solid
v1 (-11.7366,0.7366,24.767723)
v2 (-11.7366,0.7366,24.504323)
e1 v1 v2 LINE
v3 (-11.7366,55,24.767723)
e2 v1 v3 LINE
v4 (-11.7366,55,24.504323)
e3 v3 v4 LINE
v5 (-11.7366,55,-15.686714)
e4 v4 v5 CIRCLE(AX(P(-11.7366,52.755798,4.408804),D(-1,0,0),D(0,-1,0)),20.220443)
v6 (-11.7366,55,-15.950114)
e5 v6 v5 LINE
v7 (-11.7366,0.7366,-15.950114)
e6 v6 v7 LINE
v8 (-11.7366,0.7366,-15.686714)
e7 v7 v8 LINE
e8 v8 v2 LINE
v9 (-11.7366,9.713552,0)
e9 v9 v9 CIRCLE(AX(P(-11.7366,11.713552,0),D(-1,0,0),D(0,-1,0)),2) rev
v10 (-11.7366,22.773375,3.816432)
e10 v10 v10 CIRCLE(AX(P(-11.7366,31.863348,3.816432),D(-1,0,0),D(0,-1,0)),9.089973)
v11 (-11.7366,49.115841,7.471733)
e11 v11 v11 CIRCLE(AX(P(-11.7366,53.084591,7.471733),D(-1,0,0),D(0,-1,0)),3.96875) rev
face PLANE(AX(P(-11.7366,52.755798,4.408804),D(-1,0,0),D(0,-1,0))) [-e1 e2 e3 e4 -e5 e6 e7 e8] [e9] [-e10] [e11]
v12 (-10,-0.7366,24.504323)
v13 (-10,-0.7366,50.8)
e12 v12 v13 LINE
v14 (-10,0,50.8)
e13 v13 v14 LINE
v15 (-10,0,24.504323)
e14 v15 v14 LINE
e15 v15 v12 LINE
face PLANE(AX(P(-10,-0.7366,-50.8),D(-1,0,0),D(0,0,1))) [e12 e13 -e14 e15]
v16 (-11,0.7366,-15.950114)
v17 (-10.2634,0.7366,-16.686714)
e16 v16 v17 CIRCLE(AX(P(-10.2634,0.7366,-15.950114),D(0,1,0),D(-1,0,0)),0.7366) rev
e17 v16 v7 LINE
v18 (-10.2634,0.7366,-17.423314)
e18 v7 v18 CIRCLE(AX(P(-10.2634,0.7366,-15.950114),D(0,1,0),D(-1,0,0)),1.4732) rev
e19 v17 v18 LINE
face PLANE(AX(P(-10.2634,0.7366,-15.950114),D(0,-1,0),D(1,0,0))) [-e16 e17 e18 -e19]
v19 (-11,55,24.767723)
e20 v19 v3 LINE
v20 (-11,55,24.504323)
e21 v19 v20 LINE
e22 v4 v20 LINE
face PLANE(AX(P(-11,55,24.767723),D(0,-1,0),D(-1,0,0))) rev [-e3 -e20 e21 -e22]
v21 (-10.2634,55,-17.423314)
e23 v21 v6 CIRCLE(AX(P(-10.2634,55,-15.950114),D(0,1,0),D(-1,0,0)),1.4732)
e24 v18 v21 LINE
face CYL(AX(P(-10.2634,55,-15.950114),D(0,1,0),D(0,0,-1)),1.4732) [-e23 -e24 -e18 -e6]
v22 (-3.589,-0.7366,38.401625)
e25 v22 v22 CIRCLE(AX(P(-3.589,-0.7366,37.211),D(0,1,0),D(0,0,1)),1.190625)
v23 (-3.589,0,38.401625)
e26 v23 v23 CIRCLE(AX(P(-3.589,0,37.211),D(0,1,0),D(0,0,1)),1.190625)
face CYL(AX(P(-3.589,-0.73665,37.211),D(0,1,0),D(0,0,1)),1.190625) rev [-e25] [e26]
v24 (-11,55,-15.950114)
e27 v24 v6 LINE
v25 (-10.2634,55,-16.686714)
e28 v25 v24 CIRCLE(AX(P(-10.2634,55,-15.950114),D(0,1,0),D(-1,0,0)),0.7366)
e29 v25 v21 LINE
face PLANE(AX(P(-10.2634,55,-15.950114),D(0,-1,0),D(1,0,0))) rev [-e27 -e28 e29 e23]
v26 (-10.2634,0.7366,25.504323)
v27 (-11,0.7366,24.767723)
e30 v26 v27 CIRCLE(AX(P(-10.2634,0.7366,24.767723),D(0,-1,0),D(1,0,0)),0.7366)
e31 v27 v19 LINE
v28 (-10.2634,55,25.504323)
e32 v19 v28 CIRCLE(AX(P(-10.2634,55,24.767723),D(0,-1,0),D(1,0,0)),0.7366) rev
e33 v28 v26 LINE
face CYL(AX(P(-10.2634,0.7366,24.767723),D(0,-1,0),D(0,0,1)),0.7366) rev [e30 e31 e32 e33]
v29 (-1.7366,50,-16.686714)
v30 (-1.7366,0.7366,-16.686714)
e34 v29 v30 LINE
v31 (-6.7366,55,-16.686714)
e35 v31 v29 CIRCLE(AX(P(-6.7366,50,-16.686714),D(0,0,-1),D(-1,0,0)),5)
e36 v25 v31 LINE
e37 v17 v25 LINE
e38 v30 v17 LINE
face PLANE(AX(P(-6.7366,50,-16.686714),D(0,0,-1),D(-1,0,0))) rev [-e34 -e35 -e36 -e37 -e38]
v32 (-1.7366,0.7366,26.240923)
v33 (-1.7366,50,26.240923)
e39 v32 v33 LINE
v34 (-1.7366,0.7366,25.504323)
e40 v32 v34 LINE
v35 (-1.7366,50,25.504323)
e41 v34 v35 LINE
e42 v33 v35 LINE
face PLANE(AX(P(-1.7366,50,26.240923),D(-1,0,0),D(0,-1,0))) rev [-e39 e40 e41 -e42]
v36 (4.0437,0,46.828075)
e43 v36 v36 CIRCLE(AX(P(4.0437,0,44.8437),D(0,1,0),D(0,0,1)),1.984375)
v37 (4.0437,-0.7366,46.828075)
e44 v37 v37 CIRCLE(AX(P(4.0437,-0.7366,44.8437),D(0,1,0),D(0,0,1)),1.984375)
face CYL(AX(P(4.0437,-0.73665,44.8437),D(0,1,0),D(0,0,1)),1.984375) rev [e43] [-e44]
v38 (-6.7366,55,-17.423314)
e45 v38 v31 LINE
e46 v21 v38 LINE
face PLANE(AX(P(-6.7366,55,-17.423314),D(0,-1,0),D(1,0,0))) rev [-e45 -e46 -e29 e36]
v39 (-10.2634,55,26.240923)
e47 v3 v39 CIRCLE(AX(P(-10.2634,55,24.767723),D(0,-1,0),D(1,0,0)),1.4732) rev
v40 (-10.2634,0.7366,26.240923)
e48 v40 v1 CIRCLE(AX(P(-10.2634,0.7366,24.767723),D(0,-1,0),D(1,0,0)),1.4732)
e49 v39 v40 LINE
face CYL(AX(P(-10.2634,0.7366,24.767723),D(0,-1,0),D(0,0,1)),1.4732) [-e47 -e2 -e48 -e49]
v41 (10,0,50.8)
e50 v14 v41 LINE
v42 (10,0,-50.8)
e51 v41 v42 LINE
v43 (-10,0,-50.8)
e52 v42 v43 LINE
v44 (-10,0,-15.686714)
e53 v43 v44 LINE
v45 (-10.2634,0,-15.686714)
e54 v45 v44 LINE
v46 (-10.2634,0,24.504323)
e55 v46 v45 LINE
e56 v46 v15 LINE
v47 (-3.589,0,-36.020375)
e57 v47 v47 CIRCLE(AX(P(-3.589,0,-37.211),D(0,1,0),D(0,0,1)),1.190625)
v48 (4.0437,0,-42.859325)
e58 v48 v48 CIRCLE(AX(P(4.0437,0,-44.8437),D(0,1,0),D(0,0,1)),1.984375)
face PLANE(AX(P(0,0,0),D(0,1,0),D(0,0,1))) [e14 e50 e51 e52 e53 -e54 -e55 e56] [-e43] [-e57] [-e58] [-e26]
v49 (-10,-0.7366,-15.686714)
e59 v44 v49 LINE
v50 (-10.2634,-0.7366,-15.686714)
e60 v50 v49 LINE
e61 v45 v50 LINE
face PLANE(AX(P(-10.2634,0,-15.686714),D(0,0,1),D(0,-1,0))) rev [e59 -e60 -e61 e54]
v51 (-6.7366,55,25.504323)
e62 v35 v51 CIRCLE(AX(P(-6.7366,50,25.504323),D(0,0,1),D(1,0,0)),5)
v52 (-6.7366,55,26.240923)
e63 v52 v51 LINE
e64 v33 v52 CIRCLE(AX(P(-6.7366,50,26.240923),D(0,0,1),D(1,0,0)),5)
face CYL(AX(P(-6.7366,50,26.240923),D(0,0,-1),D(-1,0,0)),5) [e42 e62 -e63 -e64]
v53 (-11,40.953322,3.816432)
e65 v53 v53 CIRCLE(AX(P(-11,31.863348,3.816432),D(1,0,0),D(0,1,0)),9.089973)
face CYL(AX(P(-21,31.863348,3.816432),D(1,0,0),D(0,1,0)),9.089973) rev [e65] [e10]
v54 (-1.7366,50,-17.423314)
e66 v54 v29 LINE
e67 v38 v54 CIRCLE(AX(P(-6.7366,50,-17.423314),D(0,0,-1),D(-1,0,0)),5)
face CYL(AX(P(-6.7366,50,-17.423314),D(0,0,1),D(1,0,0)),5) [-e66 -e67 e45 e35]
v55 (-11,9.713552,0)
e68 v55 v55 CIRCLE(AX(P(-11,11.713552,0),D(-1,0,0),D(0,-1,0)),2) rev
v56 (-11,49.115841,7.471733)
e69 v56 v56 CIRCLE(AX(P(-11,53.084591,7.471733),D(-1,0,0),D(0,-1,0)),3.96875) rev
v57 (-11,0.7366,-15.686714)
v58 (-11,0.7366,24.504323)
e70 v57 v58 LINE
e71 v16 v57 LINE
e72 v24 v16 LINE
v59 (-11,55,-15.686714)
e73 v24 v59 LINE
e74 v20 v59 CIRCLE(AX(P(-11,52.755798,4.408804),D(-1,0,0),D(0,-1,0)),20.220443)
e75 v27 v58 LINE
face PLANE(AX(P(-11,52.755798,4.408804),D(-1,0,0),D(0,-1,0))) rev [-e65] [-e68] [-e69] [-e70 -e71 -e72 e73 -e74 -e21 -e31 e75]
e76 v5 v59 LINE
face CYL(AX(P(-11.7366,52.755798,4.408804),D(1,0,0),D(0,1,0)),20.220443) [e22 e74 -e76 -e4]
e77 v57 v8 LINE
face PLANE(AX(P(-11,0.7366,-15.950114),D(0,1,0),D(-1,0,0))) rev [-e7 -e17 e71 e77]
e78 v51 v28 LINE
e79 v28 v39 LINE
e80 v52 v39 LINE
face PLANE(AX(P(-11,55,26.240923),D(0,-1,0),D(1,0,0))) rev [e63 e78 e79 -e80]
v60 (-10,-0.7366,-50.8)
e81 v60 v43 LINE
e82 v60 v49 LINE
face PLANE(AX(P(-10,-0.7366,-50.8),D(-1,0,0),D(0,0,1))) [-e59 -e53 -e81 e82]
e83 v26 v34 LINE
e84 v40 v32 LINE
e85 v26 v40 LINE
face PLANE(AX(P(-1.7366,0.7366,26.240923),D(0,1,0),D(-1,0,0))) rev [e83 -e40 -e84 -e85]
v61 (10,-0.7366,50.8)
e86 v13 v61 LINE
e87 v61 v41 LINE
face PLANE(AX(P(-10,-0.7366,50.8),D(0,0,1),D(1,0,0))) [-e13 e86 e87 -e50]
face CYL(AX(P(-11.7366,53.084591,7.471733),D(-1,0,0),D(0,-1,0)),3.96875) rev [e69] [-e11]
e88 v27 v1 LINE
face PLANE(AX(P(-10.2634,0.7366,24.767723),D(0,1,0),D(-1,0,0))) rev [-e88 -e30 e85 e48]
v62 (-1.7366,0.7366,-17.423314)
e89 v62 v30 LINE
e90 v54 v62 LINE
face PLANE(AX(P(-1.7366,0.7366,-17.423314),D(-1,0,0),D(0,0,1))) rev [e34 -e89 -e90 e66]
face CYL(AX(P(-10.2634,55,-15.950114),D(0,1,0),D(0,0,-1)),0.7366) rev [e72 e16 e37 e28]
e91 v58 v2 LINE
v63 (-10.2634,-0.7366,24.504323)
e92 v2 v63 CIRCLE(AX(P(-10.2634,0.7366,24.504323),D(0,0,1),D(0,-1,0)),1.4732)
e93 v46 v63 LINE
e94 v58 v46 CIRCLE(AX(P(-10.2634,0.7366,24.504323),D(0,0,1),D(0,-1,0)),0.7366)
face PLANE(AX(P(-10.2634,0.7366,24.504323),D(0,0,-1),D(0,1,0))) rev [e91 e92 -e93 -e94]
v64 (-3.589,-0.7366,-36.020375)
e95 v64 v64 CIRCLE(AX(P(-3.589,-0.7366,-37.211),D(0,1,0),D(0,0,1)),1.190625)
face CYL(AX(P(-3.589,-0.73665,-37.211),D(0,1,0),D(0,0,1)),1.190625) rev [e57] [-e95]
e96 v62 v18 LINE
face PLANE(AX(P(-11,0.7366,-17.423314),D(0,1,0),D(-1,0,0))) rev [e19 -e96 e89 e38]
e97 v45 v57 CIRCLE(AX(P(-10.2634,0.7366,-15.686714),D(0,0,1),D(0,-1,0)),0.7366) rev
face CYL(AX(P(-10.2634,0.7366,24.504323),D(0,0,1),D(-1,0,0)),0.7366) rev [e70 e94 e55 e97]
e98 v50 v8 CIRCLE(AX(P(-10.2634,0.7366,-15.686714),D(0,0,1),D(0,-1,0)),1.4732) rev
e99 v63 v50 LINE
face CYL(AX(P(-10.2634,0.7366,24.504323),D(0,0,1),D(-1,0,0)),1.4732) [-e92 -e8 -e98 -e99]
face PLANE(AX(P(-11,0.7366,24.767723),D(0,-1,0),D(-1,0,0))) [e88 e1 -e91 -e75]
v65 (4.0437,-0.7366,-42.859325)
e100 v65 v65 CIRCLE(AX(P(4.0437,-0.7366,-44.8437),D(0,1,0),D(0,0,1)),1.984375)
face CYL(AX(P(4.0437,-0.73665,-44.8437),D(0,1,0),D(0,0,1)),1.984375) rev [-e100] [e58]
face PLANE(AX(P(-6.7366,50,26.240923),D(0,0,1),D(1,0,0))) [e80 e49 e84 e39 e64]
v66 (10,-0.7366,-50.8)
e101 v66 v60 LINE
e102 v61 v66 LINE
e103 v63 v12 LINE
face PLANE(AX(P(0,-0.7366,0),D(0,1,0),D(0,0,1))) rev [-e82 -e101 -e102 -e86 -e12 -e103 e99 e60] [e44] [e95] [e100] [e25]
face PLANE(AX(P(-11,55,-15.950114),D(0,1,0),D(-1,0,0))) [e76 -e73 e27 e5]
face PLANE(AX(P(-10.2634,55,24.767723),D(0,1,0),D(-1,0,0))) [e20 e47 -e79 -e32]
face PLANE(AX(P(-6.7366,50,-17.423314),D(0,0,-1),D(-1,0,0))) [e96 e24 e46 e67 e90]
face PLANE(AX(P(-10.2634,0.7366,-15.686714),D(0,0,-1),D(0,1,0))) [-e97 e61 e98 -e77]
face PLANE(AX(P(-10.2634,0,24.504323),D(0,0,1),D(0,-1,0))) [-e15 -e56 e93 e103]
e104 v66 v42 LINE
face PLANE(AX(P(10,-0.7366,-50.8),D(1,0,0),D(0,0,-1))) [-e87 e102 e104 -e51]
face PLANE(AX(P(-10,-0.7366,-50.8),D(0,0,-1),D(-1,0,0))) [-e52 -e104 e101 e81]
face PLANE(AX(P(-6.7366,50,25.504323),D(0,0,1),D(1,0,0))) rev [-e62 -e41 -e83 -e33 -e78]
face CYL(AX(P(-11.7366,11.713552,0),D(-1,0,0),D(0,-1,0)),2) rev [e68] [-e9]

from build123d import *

# Parameters (mm, degrees)
SKETCH1_W                 = 20
SKETCH1_H                 = 101.6
BASE_FLANGE1_DEPTH        = 0.7366
EDGE_FLANGE1_DEPTH        = 40.191036667
EDGE_FLANGE1_START        = 0.7366
EDGE_FLANGE1_FLAT_DEPTH   = 0.7366
CUT_EXTRUDE1_DEPTH        = 235.985755194
CUT_EXTRUDE1_DEPTH_BACK   = 235.985755194
SKETCH9_R                 = 2
CUT_EXTRUDE3_DEPTH        = 238.044873218
CUT_EXTRUDE3_DEPTH_BACK   = 238.044873218
SKETCH11_R                = 3.96875
CUT_EXTRUDE5_DEPTH        = 196.726274862
CUT_EXTRUDE5_DEPTH_BACK   = 196.726274862
SKETCH13_R                = 1.984375
SKETCH13_R_2              = 1.190625
EDGE_FLANGE2_DEPTH        = 54.2634
EDGE_FLANGE2_START        = 0.7366
EDGE_FLANGE2_FLAT_DEPTH   = 0.7366
EDGE_FLANGE2_BEND_DEPTH   = 54.2634
EDGE_FLANGE2_FLAT_2_DEPTH = 0.7366
SKETCH30_R                = 9.089973339
CUT_EXTRUDE15_DEPTH       = 10


# Sheet-metal steps are written as plain solids
with BuildPart() as part:
    # Sketch1 → Base-Flange1 (new body)
    with BuildSketch(Plane(origin=(0, 0, 0), x_dir=(1, 0, 0), z_dir=(0, 1, 0))):
        Rectangle(SKETCH1_W, SKETCH1_H)
    extrude(amount=-BASE_FLANGE1_DEPTH)

    # Edge-Flange1 bend section (across the edge) → Edge-Flange1 (add)
    with BuildSketch(Plane(origin=(-11, 0, -15.686713846), x_dir=(1, 0, 0), z_dir=(0, 0, 1))):
        with BuildLine():
            Line((-0.7366, 0.7366), (0, 0.7366))
            ThreePointArc((0, 0.7366), (0.215745145, 0.215745145), (0.7366, 0))
            Line((0.7366, 0), (1, 0))
            Line((1, 0), (1, -0.7366))
            Line((1, -0.7366), (0.7366, -0.7366))
            ThreePointArc((0.7366, -0.7366), (-0.30510971, -0.30510971), (-0.7366, 0.7366))
        make_face()
    extrude(amount=EDGE_FLANGE1_DEPTH)

    # Edge-Flange1 profile (on flange) → Edge-Flange1 flat (add)
    with BuildSketch(Plane.ZY.offset(11).offset(EDGE_FLANGE1_START)):
        with BuildLine():
            ThreePointArc((24.504322822, 55), (4.408804488, 72.976240445), (-15.686713846, 55))
            Line((-15.686713846, 55), (-15.686713846, 0.7366))
            Line((-15.686713846, 0.7366), (24.504322822, 0.7366))
            Line((24.504322822, 0.7366), (24.504322822, 55))
        make_face()
    extrude(amount=-EDGE_FLANGE1_FLAT_DEPTH)

    # Sketch9 → Cut-Extrude1 (cut, two sides: drawn at the far end of the back side and taken through both)
    with BuildSketch(Plane(origin=(-32.365, -124.793980752, 68.826299478), x_dir=(0, 0, -1), z_dir=(1, 0, 0)).offset(-CUT_EXTRUDE1_DEPTH_BACK)):
        with Locations(Location((68.826299478, 136.507533033, 0), (0, 0, 270))):
            Circle(SKETCH9_R)
    extrude(amount=CUT_EXTRUDE1_DEPTH + CUT_EXTRUDE1_DEPTH_BACK, mode=Mode.SUBTRACT)

    # Sketch11 → Cut-Extrude3 (cut, two sides: drawn at the far end of the back side and taken through both)
    with BuildSketch(Plane(origin=(-42.6, -124.793980752, 68.826299478), x_dir=(0, 0, -1), z_dir=(1, 0, 0)).offset(-CUT_EXTRUDE3_DEPTH_BACK)):
        with Locations(Location((61.354566786, 177.878571708, 0), (0, 0, 270))):
            Circle(SKETCH11_R)
    extrude(amount=CUT_EXTRUDE3_DEPTH + CUT_EXTRUDE3_DEPTH_BACK, mode=Mode.SUBTRACT)

    # Sketch13 → Cut-Extrude5 (cut, two sides: drawn at the far end of the back side and taken through both)
    with BuildSketch(Plane(origin=(124.911822879, 0, 68.826299478), x_dir=(-0.7071067811865436, 0, 0.7071067811865515), z_dir=(0, 1, 0)).offset(-CUT_EXTRUDE5_DEPTH_BACK)):
        with Locations(Location((68.508410595, -102.424928038, 0), (0, 0, 45))):
            Circle(SKETCH13_R)
        with Locations(Location((68.508410595, -113.219195896, 0), (0, 0, 45))):
            Circle(SKETCH13_R_2)
        with Locations(Location((5.089841868, -165.843496765, 0), (0, 0, 45))):
            Circle(SKETCH13_R)
        with Locations(Location((15.884109726, -165.843496765, 0), (0, 0, 45))):
            Circle(SKETCH13_R_2)
    extrude(amount=CUT_EXTRUDE5_DEPTH + CUT_EXTRUDE5_DEPTH_BACK, mode=Mode.SUBTRACT)

    # Edge-Flange2 bend section (across the edge) → Edge-Flange2 (add)
    with BuildSketch(Plane(origin=(-11, 0.7366, -16.686713846), x_dir=(0, 0, 1), z_dir=(0, 1, 0))):
        with BuildLine():
            Line((-0.7366, 0.7366), (0, 0.7366))
            ThreePointArc((0, 0.7366), (0.215745145, 0.215745145), (0.7366, 0))
            Line((0.7366, 0), (1, 0))
            Line((1, 0), (1, -0.7366))
            Line((1, -0.7366), (0.7366, -0.7366))
            ThreePointArc((0.7366, -0.7366), (-0.30510971, -0.30510971), (-0.7366, 0.7366))
        make_face()
    extrude(amount=EDGE_FLANGE2_DEPTH)

    # Edge-Flange2 profile (on flange) → Edge-Flange2 flat (add)
    with BuildSketch(Plane(origin=(-11, 0, -16.686713846), x_dir=(0, 1, 0), z_dir=(0, 0, -1)).offset(EDGE_FLANGE2_START)):
        with BuildLine():
            Line((50, 9.2634), (0.7366, 9.2634))
            Line((0.7366, 9.2634), (0.7366, 0.7366))
            Line((0.7366, 0.7366), (55, 0.7366))
            Line((55, 0.7366), (55, 4.2634))
            ThreePointArc((55, 4.2634), (53.535533906, 7.798933906), (50, 9.2634))
        make_face()
    extrude(amount=-EDGE_FLANGE2_FLAT_DEPTH)

    # Edge-Flange2 bend section 2 (across the edge) → Edge-Flange2 bend (add)
    with BuildSketch(Plane(origin=(-11, 55, 25.504322822), x_dir=(0, 0, -1), z_dir=(0, -1, 0))):
        with BuildLine():
            Line((-0.7366, 0.7366), (0, 0.7366))
            ThreePointArc((0, 0.7366), (0.215745145, 0.215745145), (0.7366, 0))
            Line((0.7366, 0), (1, 0))
            Line((1, 0), (1, -0.7366))
            Line((1, -0.7366), (0.7366, -0.7366))
            ThreePointArc((0.7366, -0.7366), (-0.30510971, -0.30510971), (-0.7366, 0.7366))
        make_face()
    extrude(amount=EDGE_FLANGE2_BEND_DEPTH)

    # Edge-Flange2 profile 2 (on flange) → Edge-Flange2 flat 2 (add)
    with BuildSketch(Plane(origin=(-11, 0, 25.504322822), x_dir=(0, -1, 0), z_dir=(0, 0, 1)).offset(EDGE_FLANGE2_START)):
        with BuildLine():
            ThreePointArc((-50, 9.2634), (-53.535533906, 7.798933906), (-55, 4.2634))
            Line((-55, 4.2634), (-55, 0.7366))
            Line((-55, 0.7366), (-0.7366, 0.7366))
            Line((-0.7366, 0.7366), (-0.7366, 9.2634))
            Line((-0.7366, 9.2634), (-50, 9.2634))
        make_face()
    extrude(amount=-EDGE_FLANGE2_FLAT_2_DEPTH)

    # Sketch30 → Cut-Extrude15 (cut)
    with BuildSketch(Plane(origin=(-11, 0, 0), x_dir=(0, 0, -1), z_dir=(1, 0, 0))):
        with Locations(Location((-3.816431775, 31.863348386, 0), (0, 0, 90))):
            Circle(SKETCH30_R)
    extrude(amount=-CUT_EXTRUDE15_DEPTH, mode=Mode.SUBTRACT)


solid = part.part
